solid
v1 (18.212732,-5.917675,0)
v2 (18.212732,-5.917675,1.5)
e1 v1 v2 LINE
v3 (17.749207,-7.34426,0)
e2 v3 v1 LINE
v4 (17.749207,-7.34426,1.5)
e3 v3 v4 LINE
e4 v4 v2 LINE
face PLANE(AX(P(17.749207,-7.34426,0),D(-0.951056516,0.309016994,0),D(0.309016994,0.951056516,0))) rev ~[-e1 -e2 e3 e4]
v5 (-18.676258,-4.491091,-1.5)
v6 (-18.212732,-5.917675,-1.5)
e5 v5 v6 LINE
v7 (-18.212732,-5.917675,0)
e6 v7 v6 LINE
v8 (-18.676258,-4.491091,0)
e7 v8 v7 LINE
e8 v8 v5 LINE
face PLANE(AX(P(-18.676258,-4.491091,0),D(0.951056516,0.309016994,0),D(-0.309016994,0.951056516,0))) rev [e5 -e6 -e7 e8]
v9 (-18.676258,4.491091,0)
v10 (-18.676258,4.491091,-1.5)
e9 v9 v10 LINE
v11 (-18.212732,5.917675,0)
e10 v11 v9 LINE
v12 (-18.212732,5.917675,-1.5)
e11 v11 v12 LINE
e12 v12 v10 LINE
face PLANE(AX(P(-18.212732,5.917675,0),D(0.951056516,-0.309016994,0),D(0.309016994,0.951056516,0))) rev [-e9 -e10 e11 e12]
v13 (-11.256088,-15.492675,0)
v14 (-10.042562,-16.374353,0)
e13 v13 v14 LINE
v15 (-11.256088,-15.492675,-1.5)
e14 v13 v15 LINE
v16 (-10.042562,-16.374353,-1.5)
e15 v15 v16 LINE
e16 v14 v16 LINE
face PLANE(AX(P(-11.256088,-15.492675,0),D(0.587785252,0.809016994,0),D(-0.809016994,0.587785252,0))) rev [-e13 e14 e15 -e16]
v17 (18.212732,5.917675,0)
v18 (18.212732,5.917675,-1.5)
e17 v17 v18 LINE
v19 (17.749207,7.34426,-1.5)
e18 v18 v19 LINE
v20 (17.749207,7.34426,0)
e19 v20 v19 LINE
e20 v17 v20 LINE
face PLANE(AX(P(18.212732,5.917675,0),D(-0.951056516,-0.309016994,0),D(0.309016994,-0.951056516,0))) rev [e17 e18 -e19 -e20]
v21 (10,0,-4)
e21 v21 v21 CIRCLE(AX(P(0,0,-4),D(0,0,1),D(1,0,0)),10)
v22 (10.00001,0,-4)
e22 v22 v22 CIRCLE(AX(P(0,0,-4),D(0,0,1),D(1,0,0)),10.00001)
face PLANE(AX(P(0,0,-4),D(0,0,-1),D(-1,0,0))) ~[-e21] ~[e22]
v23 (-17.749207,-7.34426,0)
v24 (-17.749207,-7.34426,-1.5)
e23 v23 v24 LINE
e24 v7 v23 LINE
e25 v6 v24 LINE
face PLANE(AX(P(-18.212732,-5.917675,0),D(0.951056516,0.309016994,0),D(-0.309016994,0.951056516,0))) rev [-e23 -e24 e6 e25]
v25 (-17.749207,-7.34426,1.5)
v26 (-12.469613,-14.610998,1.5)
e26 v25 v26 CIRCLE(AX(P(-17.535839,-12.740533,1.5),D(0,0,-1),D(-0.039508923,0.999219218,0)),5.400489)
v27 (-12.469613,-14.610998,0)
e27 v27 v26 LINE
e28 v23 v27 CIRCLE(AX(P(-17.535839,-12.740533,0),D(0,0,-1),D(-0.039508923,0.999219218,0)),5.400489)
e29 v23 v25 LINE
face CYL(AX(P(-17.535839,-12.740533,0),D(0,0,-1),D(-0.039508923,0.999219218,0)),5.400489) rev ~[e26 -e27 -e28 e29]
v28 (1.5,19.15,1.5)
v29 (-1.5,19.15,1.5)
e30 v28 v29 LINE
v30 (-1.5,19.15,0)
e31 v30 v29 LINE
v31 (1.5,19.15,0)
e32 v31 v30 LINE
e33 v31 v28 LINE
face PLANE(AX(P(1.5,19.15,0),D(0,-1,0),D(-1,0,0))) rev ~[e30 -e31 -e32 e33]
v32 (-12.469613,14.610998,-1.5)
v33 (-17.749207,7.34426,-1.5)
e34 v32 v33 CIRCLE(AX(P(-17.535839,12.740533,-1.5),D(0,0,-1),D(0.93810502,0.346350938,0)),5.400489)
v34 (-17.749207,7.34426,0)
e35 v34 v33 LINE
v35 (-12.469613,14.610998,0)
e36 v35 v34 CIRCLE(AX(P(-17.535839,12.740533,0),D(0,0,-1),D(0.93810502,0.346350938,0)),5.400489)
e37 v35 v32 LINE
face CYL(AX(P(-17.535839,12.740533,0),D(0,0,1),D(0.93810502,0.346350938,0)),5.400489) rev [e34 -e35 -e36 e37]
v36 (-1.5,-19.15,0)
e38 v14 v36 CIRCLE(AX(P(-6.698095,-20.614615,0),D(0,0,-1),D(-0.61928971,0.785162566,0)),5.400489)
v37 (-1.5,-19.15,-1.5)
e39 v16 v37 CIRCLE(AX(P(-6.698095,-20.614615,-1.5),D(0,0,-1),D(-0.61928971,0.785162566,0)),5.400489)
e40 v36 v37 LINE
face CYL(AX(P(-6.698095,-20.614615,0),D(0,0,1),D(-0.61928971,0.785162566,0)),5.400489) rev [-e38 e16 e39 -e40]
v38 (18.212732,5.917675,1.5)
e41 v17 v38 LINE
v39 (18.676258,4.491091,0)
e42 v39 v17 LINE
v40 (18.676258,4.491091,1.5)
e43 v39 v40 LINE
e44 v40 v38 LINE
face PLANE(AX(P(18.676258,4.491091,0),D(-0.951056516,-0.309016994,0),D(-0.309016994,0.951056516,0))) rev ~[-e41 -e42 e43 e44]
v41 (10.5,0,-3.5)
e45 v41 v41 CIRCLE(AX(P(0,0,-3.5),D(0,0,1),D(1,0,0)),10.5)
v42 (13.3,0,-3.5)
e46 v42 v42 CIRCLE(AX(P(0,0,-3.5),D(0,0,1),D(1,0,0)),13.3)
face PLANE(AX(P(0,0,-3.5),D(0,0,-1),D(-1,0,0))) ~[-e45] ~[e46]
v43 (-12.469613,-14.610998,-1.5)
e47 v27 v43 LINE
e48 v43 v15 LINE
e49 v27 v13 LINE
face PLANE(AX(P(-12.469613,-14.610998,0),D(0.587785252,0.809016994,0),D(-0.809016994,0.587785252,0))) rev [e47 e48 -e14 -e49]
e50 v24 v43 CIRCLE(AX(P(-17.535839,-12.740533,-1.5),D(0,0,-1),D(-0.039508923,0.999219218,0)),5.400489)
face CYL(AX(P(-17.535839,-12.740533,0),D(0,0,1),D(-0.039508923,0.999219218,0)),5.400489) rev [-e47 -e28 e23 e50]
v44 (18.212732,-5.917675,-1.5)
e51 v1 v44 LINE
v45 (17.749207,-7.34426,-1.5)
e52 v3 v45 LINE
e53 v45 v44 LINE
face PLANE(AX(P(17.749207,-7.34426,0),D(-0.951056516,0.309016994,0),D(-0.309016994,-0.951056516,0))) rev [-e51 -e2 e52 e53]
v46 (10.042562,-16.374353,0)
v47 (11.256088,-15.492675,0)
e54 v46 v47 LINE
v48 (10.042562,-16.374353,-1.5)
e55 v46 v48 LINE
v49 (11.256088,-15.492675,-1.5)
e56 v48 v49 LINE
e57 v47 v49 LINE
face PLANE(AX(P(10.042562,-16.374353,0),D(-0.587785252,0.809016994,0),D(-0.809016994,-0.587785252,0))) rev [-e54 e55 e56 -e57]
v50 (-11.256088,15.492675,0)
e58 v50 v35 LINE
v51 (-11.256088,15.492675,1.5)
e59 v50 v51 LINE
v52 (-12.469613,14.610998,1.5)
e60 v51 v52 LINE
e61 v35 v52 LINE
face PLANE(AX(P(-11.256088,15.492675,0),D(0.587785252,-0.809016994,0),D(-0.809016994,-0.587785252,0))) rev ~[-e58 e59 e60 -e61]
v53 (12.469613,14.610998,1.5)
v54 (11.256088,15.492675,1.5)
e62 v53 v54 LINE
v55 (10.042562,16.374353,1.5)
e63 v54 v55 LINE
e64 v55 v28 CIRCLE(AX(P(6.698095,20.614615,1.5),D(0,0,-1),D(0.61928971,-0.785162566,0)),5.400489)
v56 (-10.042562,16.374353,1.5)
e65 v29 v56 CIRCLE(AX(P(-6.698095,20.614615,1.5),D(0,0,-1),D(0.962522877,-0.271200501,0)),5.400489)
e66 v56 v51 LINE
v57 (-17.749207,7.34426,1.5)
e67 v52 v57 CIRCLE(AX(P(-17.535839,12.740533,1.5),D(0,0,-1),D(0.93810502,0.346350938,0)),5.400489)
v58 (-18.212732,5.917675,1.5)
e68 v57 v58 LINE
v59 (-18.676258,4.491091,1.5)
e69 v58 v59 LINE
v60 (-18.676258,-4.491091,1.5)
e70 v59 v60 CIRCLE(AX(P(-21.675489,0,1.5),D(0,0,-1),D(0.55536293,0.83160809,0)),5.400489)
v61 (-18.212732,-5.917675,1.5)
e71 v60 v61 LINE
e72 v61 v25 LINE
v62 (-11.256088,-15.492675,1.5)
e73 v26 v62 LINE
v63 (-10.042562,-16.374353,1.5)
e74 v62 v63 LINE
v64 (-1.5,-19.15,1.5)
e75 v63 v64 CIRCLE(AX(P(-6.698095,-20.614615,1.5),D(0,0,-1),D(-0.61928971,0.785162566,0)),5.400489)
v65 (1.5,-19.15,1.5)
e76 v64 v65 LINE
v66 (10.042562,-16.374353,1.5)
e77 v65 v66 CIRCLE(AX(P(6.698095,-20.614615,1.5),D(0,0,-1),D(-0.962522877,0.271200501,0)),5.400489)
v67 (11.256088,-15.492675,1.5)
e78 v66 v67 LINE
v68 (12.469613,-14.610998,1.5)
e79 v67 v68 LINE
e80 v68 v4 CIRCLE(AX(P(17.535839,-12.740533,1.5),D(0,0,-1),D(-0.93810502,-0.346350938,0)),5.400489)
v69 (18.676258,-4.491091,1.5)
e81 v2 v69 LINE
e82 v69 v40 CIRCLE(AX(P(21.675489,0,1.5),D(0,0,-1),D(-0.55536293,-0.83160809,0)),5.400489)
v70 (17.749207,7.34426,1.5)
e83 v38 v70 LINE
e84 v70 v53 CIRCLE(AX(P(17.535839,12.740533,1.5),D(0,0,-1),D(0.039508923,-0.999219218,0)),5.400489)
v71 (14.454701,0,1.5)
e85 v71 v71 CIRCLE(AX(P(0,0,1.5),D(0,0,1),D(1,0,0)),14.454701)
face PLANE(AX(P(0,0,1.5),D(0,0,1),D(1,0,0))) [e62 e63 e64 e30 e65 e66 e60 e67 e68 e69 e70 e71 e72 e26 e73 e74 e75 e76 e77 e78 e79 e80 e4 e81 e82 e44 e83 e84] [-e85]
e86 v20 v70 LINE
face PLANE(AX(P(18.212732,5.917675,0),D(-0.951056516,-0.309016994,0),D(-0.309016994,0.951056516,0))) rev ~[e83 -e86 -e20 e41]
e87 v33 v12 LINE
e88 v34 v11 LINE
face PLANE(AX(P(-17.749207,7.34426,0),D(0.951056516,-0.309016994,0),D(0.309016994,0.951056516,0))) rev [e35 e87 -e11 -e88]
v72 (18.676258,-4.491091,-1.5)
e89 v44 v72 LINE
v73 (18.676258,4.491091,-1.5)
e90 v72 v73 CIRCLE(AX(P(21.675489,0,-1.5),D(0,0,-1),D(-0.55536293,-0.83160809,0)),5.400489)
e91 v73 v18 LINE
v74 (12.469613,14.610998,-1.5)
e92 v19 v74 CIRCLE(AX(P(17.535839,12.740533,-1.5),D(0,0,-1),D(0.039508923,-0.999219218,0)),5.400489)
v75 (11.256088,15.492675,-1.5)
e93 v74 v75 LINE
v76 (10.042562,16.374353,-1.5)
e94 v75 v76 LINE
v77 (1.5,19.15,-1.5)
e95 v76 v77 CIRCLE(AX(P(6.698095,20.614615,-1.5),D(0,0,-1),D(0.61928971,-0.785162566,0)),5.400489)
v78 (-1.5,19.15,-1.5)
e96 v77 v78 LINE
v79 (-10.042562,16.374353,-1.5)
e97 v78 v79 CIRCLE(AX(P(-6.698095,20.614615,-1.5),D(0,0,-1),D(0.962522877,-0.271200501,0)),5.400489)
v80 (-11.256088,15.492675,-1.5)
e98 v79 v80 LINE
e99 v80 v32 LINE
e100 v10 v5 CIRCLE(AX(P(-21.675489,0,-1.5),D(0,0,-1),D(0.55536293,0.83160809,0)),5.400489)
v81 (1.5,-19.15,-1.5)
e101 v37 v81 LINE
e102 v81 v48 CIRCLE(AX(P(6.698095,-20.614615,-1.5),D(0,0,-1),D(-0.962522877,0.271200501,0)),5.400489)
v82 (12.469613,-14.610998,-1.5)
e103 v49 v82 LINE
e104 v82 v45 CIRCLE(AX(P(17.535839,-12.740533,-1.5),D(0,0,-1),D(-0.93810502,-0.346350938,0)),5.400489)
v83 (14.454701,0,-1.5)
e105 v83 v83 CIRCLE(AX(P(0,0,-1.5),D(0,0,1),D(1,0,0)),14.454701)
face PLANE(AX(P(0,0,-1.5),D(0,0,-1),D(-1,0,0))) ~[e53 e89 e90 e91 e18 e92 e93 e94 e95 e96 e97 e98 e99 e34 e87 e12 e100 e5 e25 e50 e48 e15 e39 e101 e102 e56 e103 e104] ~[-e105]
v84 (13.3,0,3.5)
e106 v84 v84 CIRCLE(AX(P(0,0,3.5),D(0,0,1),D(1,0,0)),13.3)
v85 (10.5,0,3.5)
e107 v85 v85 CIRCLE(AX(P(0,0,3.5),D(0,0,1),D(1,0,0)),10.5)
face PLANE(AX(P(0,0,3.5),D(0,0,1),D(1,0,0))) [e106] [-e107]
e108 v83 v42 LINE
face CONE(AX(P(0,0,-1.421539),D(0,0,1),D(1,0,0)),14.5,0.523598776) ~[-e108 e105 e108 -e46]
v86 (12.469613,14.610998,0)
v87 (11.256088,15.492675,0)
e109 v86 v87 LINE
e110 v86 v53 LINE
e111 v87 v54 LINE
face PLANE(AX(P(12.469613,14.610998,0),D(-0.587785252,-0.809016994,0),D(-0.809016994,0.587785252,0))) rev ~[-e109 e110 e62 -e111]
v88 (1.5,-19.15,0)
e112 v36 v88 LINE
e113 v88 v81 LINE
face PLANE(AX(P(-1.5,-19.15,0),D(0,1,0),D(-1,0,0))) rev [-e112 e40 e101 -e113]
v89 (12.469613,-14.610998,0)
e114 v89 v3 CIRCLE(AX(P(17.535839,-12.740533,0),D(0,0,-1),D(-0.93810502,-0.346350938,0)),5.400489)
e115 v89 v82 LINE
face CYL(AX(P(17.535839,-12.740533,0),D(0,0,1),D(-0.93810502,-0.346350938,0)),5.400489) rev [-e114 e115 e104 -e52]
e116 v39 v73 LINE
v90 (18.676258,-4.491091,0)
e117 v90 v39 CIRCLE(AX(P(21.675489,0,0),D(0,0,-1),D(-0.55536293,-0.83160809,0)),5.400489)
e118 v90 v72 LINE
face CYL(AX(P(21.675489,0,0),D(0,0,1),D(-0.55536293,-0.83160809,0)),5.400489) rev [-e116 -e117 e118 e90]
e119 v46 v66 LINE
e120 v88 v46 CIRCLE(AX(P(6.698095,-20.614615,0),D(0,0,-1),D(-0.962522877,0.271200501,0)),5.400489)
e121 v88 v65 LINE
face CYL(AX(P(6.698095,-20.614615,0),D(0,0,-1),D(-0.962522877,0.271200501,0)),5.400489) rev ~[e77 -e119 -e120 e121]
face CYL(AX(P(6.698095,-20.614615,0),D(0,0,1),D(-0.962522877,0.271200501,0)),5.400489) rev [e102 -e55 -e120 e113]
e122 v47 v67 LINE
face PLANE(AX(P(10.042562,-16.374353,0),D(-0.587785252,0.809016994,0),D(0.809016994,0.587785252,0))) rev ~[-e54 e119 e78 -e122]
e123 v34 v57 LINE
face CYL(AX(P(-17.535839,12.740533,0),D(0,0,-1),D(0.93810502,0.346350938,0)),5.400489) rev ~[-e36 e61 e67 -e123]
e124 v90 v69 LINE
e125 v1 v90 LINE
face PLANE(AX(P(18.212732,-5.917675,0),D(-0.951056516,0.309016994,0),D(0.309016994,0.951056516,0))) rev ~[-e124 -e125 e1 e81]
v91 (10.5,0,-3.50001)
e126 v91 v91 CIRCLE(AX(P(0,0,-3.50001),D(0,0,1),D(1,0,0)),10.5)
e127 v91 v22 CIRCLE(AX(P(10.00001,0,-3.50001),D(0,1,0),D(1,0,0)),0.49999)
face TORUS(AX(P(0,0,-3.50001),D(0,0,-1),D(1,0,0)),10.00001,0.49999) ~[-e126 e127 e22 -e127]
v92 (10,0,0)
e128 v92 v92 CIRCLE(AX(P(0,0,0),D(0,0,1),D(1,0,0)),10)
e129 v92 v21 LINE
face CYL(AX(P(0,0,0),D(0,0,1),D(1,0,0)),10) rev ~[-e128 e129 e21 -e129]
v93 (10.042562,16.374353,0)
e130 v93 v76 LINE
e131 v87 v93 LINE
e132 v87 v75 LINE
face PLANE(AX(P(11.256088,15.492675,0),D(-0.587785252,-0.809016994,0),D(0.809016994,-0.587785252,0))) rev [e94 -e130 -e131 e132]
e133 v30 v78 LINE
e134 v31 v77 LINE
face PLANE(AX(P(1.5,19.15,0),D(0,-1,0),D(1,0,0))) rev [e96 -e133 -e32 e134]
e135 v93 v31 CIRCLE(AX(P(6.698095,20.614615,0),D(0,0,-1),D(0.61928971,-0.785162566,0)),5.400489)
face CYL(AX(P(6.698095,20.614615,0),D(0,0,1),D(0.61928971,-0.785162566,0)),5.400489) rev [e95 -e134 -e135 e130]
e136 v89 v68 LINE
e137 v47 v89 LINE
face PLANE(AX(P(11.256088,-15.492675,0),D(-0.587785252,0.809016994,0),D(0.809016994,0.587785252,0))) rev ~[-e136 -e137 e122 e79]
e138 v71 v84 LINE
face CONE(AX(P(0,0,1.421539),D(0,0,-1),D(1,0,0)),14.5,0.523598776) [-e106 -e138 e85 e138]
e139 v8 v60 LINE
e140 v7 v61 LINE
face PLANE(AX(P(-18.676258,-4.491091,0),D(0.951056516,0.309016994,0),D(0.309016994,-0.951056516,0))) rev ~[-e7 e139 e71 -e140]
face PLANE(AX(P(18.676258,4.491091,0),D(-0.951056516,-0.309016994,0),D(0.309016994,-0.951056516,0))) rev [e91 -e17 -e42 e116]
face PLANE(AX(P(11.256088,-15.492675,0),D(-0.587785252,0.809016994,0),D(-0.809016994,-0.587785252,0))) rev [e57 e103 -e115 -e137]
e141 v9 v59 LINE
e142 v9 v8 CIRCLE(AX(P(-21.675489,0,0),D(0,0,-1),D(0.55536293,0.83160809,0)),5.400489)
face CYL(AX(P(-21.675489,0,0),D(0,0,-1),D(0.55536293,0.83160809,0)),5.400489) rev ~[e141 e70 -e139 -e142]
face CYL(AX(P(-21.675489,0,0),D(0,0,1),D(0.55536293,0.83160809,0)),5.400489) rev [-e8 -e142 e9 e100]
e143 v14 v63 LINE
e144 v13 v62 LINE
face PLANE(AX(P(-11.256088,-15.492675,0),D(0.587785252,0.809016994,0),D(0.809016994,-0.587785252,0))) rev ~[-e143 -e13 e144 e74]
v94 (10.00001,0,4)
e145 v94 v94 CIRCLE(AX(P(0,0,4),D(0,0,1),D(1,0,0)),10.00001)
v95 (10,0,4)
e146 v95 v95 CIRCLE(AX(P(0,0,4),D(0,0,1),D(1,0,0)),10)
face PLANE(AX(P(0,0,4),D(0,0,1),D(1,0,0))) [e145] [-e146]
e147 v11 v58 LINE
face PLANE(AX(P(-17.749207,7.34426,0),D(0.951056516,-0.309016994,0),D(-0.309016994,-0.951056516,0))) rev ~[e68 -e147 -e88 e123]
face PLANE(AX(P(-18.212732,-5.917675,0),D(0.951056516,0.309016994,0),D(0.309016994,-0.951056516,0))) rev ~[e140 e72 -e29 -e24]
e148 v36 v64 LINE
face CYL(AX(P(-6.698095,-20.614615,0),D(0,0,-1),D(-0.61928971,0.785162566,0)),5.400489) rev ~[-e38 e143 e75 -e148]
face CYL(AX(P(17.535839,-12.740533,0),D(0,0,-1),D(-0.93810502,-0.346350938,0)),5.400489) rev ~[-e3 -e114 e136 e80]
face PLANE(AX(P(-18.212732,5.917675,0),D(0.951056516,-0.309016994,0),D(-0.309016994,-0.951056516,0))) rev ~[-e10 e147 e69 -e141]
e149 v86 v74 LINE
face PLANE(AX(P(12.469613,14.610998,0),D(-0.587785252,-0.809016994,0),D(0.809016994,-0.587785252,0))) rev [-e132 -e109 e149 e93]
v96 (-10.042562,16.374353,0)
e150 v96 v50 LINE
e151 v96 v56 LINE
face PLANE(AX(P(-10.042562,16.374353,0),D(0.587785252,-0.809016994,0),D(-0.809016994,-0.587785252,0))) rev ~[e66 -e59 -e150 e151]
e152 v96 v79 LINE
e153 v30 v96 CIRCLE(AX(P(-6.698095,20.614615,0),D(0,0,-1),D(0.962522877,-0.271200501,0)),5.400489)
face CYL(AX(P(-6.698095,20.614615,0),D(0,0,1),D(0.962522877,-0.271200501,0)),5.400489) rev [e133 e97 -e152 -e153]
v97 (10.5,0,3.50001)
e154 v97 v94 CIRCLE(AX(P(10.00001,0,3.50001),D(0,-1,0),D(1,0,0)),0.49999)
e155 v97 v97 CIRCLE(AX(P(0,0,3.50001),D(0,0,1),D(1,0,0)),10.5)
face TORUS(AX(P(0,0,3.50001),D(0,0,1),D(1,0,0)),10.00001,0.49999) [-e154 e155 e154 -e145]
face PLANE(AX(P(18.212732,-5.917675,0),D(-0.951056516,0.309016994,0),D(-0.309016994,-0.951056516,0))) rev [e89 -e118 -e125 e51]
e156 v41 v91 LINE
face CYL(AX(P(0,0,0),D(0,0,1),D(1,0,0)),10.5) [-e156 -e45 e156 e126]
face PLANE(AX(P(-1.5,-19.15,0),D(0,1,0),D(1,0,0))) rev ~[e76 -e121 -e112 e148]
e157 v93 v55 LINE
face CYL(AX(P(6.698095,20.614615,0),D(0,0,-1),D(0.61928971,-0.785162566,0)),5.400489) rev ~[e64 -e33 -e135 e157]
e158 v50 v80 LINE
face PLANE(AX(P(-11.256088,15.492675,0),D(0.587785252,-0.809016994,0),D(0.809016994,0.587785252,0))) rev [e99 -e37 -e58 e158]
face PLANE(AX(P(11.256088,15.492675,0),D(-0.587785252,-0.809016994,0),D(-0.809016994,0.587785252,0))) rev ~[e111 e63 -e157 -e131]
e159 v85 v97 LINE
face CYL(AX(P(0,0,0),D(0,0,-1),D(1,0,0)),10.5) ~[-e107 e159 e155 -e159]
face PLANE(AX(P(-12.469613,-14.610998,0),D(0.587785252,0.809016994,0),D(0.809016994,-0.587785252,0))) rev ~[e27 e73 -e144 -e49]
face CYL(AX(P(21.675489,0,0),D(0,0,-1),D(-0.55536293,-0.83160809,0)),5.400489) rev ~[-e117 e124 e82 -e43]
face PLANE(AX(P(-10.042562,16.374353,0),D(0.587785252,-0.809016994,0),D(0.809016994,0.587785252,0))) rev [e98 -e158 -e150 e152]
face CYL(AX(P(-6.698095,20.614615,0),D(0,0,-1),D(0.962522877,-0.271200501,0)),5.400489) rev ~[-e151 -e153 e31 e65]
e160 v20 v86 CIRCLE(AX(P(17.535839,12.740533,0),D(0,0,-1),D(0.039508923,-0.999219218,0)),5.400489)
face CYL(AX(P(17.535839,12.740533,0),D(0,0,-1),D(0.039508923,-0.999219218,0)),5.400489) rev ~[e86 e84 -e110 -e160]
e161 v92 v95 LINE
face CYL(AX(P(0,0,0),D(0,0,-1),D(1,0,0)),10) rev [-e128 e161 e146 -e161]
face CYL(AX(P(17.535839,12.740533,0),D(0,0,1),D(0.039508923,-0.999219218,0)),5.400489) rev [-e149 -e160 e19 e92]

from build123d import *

# Parameters (mm, degrees)
F0_R     = 14.5
F1_DEPTH = 1.5
F0_R_2   = 10.5
F2_DEPTH = 3.5
F0_R_3   = 10
F3_DEPTH = 4
F5_R     = 0.49999


# Not quite as in the source:
# - a fillet or chamfer that OpenCascade refuses, or shapes differently, is made with other operations: its cross-section is extruded or revolved along the edge and cut away or added
# - a fillet or chamfer is up to 0.001 mm smaller than in the source, because OpenCascade refuses the exact size


with BuildPart() as f1:
    # F0 (on Top) → F1 (new body)
    with BuildSketch(Plane.XY):
        with BuildLine():
            Line((-17.7492067955, 7.3442602167), (-18.2127322871, 5.9176754423))
            Line((-18.2127322871, 5.9176754423), (-18.6762577786, 4.4910906678))
            ThreePointArc((-18.6762577786, 4.4910906678), (-16.275, 0), (-18.6762577786, -4.4910906678))
            Line((-18.6762577786, -4.4910906678), (-18.2127322871, -5.9176754423))
            Line((-18.2127322871, -5.9176754423), (-17.7492067955, -7.3442602167))
            ThreePointArc((-17.7492067955, -7.3442602167), (-13.1667515835, -9.5662049811), (-12.469613073, -14.6109975638))
            Line((-12.469613073, -14.6109975638), (-11.2560875814, -15.4926754423))
            Line((-11.2560875814, -15.4926754423), (-10.0425620898, -16.3743533207))
            ThreePointArc((-10.0425620898, -16.3743533207), (-5.0292515835, -15.4784448027), (-1.5, -19.15))
            Line((-1.5, -19.15), (0, -19.15))
            Line((0, -19.15), (1.5, -19.15))
            ThreePointArc((1.5, -19.15), (5.0292515835, -15.4784448027), (10.0425620898, -16.3743533207))
            Line((10.0425620898, -16.3743533207), (11.2560875814, -15.4926754423))
            Line((11.2560875814, -15.4926754423), (12.469613073, -14.6109975638))
            ThreePointArc((12.469613073, -14.6109975638), (13.1667515835, -9.5662049811), (17.7492067955, -7.3442602167))
            Line((17.7492067955, -7.3442602167), (18.2127322871, -5.9176754423))
            Line((18.2127322871, -5.9176754423), (18.6762577786, -4.4910906678))
            ThreePointArc((18.6762577786, -4.4910906678), (16.275, 0), (18.6762577786, 4.4910906678))
            Line((18.6762577786, 4.4910906678), (18.2127322871, 5.9176754423))
            Line((18.2127322871, 5.9176754423), (17.7492067955, 7.3442602167))
            ThreePointArc((17.7492067955, 7.3442602167), (13.1667515835, 9.5662049811), (12.469613073, 14.6109975638))
            Line((12.469613073, 14.6109975638), (11.2560875814, 15.4926754423))
            Line((11.2560875814, 15.4926754423), (10.0425620898, 16.3743533207))
            ThreePointArc((10.0425620898, 16.3743533207), (5.0292515835, 15.4784448027), (1.5, 19.15))
            Line((1.5, 19.15), (0, 19.15))
            Line((0, 19.15), (-1.5, 19.15))
            ThreePointArc((-1.5, 19.15), (-5.0292515835, 15.4784448027), (-10.0425620898, 16.3743533207))
            Line((-10.0425620898, 16.3743533207), (-11.2560875814, 15.4926754423))
            Line((-11.2560875814, 15.4926754423), (-12.469613073, 14.6109975638))
            ThreePointArc((-12.469613073, 14.6109975638), (-13.1667515835, 9.5662049811), (-17.7492067955, 7.3442602167))
        make_face()
        Circle(F0_R, mode=Mode.SUBTRACT)
    extrude(amount=F1_DEPTH)

    # F0 (on Top) → F2 (join)
    with BuildSketch(Plane.XY):
        Circle(F0_R)
        Circle(F0_R_2, mode=Mode.SUBTRACT)
    extrude(amount=F2_DEPTH)

    # F0 (on Top) → F3 (join)
    with BuildSketch(Plane.XY):
        Circle(F0_R_2)
        Circle(F0_R_3, mode=Mode.SUBTRACT)
    extrude(amount=F3_DEPTH)

    # F4: chamfer of 1.2 x 2.0784609691 on 1 edges, made by hand


with BuildPart() as f4_tool2:
    # F4_s3 → F4_t4 (revolve)
    with BuildSketch(Plane.XZ):
        Polygon((14.5, 1.4215390309), (13.3, 3.5), (14.5, 3.5), align=None)
    revolve(axis=Axis((0, 0, 3.5), (0, 0, 1)))

    split(bisect_by=Plane.XY.offset(1.5), keep=Keep.TOP)


with BuildPart() as f1_1:
    add(f1.part)

    # F4_t1: cut F4_tool2
    add(f4_tool2.part, mode=Mode.SUBTRACT)

    # F5 (radius 0.5 in the source; OpenCascade refuses exactly that, so slightly less here)
    f5_edges = [f1_1.edges().sort_by_distance(p)[0] for p in [
        (-10.5, 0, 4),
    ]]
    fillet(f5_edges, radius=F5_R)

    # F6: F1 across face


with BuildPart() as f1_2:
    add(f1_1.part)
    add(f1_1.part.mirror(Plane(origin=(0, 0, 0), x_dir=(1, 0, 0), z_dir=(0, 0, -1))))


solid = f1_2.part
